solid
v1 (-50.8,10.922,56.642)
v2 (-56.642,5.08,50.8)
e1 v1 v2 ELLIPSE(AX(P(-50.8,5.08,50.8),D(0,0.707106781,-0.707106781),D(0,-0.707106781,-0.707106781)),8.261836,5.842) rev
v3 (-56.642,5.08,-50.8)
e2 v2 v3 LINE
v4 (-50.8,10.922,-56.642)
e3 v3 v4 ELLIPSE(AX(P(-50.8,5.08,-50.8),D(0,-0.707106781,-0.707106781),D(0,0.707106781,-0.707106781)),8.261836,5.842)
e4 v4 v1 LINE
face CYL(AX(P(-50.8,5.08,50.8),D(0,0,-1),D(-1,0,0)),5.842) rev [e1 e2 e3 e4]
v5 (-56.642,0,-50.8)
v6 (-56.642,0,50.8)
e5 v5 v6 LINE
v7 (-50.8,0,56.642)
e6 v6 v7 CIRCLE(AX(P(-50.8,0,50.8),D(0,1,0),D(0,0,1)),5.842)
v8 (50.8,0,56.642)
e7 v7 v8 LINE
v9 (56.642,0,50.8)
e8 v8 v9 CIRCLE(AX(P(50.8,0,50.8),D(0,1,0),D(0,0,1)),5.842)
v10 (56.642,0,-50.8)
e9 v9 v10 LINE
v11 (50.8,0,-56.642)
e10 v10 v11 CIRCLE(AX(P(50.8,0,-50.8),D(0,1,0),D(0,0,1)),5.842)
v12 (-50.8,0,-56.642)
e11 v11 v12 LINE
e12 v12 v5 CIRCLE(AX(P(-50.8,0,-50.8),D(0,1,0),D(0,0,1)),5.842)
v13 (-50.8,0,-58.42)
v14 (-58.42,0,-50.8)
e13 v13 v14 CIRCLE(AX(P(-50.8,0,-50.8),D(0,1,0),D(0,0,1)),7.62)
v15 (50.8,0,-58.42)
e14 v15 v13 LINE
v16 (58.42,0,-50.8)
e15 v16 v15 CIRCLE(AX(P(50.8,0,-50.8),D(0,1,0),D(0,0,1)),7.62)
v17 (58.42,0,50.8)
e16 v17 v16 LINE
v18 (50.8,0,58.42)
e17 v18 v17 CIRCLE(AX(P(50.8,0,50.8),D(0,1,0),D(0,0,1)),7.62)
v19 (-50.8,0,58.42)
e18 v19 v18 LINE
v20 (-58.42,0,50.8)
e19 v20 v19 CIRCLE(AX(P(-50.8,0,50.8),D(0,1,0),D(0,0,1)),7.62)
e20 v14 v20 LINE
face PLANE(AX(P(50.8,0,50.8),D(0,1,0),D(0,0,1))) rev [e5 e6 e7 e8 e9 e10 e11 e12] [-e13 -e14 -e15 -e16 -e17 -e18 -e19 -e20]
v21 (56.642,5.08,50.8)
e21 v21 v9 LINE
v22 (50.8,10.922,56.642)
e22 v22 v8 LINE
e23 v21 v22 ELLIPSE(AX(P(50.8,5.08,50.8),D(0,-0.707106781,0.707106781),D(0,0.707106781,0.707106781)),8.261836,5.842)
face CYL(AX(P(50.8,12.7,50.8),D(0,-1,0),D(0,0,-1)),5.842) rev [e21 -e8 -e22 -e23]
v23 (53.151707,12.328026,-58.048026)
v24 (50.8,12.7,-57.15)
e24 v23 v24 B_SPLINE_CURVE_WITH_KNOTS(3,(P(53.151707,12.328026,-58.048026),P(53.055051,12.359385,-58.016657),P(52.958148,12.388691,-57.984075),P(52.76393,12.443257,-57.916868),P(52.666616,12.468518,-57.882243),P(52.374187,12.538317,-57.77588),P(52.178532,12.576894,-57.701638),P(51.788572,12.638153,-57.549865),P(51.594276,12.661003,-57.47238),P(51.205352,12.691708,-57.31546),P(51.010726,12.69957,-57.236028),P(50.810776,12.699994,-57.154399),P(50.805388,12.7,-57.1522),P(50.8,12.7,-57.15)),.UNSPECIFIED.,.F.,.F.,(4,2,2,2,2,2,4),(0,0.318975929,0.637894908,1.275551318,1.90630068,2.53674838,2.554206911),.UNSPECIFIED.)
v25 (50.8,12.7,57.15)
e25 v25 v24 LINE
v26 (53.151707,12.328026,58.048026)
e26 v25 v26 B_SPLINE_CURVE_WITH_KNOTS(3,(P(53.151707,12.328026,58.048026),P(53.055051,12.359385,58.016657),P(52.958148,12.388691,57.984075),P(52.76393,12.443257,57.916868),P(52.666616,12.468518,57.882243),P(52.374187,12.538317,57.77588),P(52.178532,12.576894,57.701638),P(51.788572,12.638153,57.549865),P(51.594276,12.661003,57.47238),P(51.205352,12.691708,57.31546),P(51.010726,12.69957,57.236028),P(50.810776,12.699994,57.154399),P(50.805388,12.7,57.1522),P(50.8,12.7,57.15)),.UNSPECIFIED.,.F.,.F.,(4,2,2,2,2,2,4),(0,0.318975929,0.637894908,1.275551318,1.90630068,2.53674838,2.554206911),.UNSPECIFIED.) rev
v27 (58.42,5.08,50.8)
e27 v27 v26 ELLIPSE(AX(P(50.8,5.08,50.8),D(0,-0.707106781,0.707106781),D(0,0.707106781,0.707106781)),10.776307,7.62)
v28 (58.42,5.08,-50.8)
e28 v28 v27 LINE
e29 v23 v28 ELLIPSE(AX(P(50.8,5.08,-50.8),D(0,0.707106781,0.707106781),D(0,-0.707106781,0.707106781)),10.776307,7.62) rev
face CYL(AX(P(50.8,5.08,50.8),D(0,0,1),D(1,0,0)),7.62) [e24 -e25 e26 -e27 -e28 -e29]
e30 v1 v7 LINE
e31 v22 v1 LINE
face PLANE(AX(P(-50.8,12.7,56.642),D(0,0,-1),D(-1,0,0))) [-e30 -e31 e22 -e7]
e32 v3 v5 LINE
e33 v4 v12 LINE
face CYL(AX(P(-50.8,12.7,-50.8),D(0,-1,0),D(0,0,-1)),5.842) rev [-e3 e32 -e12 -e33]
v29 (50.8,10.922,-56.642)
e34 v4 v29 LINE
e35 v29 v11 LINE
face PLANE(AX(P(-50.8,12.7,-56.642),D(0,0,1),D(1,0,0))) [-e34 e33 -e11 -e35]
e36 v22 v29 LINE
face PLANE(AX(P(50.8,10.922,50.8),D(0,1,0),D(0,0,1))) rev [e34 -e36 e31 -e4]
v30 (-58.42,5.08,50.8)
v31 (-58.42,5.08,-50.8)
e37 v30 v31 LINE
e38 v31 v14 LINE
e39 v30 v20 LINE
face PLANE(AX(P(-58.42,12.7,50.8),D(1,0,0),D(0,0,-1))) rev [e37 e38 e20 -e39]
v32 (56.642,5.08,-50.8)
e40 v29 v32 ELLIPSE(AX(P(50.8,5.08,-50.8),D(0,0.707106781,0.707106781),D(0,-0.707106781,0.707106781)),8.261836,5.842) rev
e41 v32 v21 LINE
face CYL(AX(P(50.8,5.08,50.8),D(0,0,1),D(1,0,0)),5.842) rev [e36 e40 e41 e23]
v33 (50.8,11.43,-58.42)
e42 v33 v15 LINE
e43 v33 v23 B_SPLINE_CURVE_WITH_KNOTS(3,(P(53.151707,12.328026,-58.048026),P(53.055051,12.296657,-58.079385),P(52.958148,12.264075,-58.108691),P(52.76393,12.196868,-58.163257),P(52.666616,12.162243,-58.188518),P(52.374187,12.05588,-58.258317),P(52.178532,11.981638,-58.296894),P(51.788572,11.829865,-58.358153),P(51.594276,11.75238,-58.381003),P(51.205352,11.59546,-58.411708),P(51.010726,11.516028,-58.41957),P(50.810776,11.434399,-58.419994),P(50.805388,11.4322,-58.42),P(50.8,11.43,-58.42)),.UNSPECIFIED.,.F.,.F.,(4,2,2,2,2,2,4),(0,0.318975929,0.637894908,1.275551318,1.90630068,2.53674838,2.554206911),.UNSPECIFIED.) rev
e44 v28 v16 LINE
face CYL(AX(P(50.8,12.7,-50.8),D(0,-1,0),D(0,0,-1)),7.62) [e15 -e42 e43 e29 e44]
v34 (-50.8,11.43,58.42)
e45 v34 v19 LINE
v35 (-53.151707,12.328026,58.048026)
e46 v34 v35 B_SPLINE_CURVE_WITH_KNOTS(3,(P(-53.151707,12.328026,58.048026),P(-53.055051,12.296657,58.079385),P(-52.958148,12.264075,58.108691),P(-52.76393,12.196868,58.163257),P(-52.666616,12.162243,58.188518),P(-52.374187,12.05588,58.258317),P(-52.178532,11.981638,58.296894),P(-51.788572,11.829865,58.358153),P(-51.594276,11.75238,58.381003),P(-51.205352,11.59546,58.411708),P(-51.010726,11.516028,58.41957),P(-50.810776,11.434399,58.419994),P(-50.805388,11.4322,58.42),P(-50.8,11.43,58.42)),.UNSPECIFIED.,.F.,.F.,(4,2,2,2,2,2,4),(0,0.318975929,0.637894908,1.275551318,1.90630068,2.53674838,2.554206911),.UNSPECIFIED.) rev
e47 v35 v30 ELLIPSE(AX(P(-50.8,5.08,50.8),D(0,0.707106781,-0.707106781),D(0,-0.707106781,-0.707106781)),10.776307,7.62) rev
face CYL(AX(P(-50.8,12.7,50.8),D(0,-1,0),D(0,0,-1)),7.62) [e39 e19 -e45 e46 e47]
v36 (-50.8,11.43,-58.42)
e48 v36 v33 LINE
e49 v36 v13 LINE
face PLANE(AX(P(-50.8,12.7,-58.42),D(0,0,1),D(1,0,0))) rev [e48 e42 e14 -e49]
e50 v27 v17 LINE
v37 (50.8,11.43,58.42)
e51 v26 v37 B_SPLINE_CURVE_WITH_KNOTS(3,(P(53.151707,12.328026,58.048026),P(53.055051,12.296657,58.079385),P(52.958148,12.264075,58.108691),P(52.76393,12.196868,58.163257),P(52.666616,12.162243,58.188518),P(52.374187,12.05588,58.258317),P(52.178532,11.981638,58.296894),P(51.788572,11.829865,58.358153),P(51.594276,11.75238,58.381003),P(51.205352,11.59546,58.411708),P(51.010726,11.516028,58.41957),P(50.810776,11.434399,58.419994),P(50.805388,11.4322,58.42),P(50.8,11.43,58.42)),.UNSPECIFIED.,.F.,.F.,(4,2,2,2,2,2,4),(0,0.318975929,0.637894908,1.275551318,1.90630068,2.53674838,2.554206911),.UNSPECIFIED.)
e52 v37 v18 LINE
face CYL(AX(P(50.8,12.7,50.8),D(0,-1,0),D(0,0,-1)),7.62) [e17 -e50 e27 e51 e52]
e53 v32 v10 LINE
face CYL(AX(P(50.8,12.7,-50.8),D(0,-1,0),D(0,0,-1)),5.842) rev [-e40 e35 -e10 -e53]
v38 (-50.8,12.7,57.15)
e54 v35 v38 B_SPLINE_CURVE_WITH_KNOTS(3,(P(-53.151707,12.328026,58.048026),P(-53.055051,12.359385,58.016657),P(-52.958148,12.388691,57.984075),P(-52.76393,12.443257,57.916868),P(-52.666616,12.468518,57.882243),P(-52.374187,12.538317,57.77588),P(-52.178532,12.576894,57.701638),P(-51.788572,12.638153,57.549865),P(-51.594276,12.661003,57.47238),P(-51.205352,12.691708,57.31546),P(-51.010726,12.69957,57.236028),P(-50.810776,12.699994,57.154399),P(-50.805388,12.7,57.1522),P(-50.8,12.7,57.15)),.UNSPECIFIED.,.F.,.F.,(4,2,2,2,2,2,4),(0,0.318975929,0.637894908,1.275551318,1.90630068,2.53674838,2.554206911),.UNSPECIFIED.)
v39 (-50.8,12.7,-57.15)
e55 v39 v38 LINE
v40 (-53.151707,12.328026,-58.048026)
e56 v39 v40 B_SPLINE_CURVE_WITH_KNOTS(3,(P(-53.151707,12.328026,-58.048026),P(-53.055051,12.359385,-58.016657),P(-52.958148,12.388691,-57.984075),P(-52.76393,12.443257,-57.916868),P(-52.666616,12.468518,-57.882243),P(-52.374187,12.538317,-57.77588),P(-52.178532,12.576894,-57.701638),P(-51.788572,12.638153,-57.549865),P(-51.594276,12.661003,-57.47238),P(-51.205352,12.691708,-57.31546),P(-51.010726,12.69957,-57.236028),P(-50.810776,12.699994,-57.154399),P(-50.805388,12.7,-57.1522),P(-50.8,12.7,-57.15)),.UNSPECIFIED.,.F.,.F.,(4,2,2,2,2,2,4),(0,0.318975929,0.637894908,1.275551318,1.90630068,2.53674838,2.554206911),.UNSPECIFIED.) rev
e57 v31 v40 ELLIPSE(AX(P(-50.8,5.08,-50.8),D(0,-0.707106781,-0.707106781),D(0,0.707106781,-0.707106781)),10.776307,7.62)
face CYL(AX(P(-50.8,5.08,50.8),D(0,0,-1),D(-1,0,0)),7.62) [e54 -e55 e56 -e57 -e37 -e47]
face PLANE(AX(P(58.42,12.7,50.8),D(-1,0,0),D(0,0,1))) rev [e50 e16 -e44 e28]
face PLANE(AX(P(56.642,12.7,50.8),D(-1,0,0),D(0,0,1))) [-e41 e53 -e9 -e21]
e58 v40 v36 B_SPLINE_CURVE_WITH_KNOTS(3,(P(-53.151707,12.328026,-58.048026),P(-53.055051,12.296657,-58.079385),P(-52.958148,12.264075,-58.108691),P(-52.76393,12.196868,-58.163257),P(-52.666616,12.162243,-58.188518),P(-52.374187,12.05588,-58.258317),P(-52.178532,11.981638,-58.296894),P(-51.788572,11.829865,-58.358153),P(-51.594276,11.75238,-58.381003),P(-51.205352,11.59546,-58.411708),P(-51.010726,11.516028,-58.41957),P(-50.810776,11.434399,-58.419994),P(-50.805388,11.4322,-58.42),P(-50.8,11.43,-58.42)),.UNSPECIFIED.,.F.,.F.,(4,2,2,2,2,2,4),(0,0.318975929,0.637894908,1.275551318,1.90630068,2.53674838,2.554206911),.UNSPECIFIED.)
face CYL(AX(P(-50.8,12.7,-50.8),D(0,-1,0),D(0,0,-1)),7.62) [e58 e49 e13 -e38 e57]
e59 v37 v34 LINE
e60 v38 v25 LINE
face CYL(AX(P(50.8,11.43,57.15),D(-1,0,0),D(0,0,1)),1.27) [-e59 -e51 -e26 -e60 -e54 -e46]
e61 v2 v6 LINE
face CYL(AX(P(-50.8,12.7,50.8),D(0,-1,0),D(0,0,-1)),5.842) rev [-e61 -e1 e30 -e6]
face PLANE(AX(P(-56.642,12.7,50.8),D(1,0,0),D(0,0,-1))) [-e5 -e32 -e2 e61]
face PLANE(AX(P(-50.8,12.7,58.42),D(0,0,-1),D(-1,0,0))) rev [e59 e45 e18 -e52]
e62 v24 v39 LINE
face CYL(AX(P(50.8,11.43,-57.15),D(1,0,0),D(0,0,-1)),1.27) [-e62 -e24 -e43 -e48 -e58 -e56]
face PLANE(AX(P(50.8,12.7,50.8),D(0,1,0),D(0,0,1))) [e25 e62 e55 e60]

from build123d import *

# Parameters (mm, degrees)
BOSS_EXTRUDE1_DEPTH = 12.7
FILLET1_R           = 7.62
FILLET3_R           = 1.27
SHELL1_T            = -1.778


with BuildPart() as part:
    # Sketch2 → Boss-Extrude1 (new body)
    with BuildSketch(Plane(origin=(0, 0, 0), x_dir=(1, 0, 0), z_dir=(0, 1, 0))):
        with BuildLine():
            Line((-50.8, -58.42), (50.8, -58.42))
            ThreePointArc((50.8, -58.42), (56.188153673, -56.188153673), (58.42, -50.8))
            Line((58.42, -50.8), (58.42, 50.8))
            ThreePointArc((58.42, 50.8), (56.188153673, 56.188153673), (50.8, 58.42))
            Line((50.8, 58.42), (-50.8, 58.42))
            ThreePointArc((-50.8, 58.42), (-56.188153673, 56.188153673), (-58.42, 50.8))
            Line((-58.42, 50.8), (-58.42, -50.8))
            ThreePointArc((-58.42, -50.8), (-56.188153673, -56.188153673), (-50.8, -58.42))
        make_face()
    extrude(amount=BOSS_EXTRUDE1_DEPTH)

    # Fillet1
    # the kernel refuses this fillet: 7.62 mm, written as the material it takes off along each edge
    with BuildSketch(Plane(origin=(58.42, 12.7, 69.85), x_dir=(0, -1, 0), z_dir=(0, 0, -1)), Plane(origin=(-58.42, 12.7, -69.85), x_dir=(0, -1, 0), z_dir=(0, 0, 1))) as fillet1_piece_1:
        with BuildLine():
            CenterArc((FILLET1_R, FILLET1_R), FILLET1_R, 180, 90)
            Line((0, FILLET1_R), (0, 0))
            Line((0, 0), (FILLET1_R, 0))
        make_face()
    extrude(amount=139.7, mode=Mode.SUBTRACT)

    # Fillet3
    # the kernel refuses this fillet: 1.27 mm, written as the material it takes off along each edge
    with BuildSketch(Plane(origin=(53.975, 12.7, -58.42), x_dir=(0, 0, 1), z_dir=(-1, 0, 0))) as fillet3_piece_1:
        with BuildLine():
            CenterArc((FILLET3_R, -FILLET3_R), FILLET3_R, 90, 90)
            Line((0, -FILLET3_R), (0, 0))
            Line((0, 0), (FILLET3_R, 0))
        make_face()
    extrude(amount=107.95, mode=Mode.SUBTRACT)
    with BuildSketch(Plane(origin=(-53.975, 12.7, 58.42), x_dir=(0, -1, 0), z_dir=(1, 0, 0))) as fillet3_piece_2:
        with BuildLine():
            CenterArc((FILLET3_R, FILLET3_R), FILLET3_R, 180, 90)
            Line((0, FILLET3_R), (0, 0))
            Line((0, 0), (FILLET3_R, 0))
        make_face()
    extrude(amount=107.95, mode=Mode.SUBTRACT)

    # Shell1
    shell1_openings = [part.faces().sort_by_distance(p)[0] for p in [
        (0, 0, 0),
    ]]
    offset(amount=SHELL1_T, openings=shell1_openings)


solid = part.part
